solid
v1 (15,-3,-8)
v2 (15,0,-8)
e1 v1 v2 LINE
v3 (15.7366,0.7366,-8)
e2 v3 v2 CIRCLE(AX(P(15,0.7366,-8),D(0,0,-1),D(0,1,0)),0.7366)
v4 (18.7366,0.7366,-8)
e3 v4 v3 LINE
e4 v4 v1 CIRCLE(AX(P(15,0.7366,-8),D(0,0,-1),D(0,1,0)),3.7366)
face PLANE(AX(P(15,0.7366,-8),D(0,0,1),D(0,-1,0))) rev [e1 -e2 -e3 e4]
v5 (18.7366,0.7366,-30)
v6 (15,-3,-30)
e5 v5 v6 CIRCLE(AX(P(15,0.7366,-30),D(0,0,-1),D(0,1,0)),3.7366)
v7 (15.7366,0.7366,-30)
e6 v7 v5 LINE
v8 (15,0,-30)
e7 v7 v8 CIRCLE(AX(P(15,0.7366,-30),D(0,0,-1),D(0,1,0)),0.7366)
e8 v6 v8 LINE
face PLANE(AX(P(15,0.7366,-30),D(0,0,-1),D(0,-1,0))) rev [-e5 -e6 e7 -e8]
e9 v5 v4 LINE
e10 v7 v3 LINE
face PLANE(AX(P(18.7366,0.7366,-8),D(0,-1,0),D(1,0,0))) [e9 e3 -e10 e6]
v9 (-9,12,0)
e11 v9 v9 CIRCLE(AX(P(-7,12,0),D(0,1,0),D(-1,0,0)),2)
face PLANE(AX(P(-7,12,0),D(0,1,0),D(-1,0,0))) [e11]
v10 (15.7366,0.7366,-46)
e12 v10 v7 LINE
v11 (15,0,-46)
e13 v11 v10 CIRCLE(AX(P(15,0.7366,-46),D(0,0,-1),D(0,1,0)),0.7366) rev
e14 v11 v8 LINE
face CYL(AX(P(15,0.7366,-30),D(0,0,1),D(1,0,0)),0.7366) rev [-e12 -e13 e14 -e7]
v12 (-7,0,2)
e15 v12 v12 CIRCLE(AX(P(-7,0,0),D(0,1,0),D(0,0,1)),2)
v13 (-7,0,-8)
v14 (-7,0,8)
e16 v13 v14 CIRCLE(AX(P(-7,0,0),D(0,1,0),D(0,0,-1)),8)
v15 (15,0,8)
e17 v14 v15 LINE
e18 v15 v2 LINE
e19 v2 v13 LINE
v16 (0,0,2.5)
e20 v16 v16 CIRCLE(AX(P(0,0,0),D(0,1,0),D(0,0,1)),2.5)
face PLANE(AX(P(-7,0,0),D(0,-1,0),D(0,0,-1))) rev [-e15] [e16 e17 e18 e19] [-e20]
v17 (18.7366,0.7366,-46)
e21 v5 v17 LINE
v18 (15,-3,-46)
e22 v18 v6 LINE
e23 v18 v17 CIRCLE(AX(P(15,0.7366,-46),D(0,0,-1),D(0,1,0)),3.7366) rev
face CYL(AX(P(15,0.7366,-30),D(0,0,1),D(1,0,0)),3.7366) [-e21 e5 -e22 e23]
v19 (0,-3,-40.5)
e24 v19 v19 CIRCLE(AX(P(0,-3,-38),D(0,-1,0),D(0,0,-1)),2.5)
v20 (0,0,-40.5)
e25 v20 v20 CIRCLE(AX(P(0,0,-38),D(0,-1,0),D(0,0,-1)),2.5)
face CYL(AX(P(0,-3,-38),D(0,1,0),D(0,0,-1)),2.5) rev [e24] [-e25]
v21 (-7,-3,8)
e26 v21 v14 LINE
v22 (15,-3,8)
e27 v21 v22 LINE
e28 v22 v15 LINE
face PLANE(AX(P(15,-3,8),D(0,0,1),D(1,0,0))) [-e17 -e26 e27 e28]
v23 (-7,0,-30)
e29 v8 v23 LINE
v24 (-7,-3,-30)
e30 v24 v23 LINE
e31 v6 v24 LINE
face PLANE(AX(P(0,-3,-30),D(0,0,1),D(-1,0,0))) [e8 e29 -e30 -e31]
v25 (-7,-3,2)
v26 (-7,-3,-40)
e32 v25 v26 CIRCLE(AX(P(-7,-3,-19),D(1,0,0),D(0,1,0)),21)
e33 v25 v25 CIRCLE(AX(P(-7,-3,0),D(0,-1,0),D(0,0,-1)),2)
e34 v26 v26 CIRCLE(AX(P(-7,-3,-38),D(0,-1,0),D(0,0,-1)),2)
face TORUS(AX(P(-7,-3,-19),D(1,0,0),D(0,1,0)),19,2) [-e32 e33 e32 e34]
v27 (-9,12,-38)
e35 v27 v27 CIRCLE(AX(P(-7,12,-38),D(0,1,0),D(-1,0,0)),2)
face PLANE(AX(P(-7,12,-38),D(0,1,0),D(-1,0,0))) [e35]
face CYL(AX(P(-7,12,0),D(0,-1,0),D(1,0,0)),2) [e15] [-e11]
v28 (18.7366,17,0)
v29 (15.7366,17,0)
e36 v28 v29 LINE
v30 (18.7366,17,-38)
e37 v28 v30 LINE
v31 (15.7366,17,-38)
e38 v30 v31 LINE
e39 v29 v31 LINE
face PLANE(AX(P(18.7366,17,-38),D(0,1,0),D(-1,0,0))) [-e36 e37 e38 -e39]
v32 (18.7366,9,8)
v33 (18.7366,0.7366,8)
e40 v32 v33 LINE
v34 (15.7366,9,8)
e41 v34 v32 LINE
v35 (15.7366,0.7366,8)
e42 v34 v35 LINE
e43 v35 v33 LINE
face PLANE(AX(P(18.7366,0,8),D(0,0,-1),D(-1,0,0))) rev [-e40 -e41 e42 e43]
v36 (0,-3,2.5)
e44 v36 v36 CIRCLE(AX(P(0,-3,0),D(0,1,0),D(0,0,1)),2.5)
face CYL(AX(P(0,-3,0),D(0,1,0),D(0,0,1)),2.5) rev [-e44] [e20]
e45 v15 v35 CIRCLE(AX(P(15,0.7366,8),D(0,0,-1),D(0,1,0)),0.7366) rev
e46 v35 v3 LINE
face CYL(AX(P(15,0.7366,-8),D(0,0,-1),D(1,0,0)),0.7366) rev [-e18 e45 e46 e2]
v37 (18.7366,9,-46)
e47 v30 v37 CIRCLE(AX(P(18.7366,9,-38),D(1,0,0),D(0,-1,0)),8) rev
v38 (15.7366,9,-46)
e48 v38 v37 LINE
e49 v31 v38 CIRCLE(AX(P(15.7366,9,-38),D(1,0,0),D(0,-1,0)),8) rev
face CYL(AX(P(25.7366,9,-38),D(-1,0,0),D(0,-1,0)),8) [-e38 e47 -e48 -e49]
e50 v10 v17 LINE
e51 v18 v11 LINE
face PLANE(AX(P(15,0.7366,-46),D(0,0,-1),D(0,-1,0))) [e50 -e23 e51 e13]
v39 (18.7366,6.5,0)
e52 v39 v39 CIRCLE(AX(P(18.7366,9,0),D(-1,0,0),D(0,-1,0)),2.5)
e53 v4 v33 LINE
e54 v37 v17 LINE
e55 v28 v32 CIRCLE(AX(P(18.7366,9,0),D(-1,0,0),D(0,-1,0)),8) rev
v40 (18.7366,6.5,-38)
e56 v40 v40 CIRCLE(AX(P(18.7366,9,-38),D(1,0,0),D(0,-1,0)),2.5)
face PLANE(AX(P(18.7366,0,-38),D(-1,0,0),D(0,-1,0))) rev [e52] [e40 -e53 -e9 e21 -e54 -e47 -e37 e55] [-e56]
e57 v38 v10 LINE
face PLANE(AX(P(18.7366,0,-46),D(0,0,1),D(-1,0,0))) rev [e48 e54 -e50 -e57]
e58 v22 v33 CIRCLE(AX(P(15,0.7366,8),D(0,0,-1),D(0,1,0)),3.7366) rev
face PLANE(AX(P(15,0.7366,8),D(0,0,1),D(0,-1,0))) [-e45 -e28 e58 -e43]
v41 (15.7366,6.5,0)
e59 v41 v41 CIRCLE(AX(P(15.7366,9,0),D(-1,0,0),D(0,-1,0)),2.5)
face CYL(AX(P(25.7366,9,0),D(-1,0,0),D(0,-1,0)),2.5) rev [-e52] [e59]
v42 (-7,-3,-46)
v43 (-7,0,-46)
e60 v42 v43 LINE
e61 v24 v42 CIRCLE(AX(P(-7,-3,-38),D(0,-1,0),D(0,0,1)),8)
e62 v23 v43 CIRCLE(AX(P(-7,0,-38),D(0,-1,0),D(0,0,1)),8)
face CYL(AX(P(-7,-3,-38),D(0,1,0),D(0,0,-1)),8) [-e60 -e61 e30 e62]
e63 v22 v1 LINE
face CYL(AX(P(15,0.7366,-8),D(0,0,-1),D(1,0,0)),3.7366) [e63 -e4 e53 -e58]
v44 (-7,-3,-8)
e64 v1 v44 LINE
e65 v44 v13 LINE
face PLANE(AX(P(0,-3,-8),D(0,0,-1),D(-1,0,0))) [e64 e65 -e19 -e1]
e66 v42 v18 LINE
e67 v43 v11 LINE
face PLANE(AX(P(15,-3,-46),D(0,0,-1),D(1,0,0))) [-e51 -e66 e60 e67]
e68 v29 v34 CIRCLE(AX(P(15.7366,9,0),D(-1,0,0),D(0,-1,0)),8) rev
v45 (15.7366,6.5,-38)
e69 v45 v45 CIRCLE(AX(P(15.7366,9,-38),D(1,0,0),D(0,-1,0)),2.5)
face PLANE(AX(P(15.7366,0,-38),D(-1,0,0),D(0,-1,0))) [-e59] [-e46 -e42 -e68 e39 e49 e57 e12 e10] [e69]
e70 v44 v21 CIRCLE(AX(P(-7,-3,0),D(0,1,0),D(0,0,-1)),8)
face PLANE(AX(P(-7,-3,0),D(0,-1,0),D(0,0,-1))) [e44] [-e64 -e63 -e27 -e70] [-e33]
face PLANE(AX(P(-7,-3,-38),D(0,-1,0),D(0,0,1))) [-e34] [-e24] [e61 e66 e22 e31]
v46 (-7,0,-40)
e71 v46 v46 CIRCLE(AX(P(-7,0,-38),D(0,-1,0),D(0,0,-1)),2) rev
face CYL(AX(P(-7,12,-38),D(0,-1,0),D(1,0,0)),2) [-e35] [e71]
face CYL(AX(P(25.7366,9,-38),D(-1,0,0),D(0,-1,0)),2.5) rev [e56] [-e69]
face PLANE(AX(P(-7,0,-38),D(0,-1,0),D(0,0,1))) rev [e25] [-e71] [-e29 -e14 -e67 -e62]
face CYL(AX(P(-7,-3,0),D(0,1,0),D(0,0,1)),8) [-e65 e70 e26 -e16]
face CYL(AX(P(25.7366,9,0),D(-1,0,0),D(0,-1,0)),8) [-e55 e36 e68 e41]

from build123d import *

# Parameters (mm, degrees)
SKETCH1_R           = 2.5
SKETCH1_R_2         = 2
BASE_FLANGE1_DEPTH  = 3
EDGE_FLANGE1_DEPTH  = 16
SKETCH10_R          = 2.5
CUT_EXTRUDE1_DEPTH  = 10
TAB1_START          = -3
TAB1_DEPTH          = 3
SWEEP1_PROFILE_R    = 2
BOSS_EXTRUDE1_START = 15
SKETCH35_R          = 2
BOSS_EXTRUDE1_DEPTH = 15


# Read off the part's stored shape, not the designer's step: Tab1
# Sheet-metal steps are written as plain solids
with BuildPart() as part:
    # Sketch1 → Base-Flange1 (new body)
    with BuildSketch(Plane(origin=(0, 0, 0), x_dir=(1, 0, 0), z_dir=(0, 1, 0))):
        with BuildLine():
            Line((0, -8), (-7, -8))
            ThreePointArc((-7, -8), (-15, 0), (-7, 8))
            Line((-7, 8), (0, 8))
            Line((0, 8), (15, 8))
            Line((15, 8), (15, -8))
            Line((15, -8), (0, -8))
        make_face()
        with Locations(Location((0, 0, 0), (0, 0, 270))):
            Circle(SKETCH1_R, mode=Mode.SUBTRACT)
        with Locations(Location((-7, 0, 0), (0, 0, 270))):
            Circle(SKETCH1_R_2, mode=Mode.SUBTRACT)
    extrude(amount=-BASE_FLANGE1_DEPTH)

    # Edge-Flange1 section (across the edge) → Edge-Flange1 (add)
    with BuildSketch(Plane(origin=(15.7366, 0, 8), x_dir=(-1, 0, 0), z_dir=(0, 0, -1))):
        with BuildLine():
            Line((-3, 0.7366), (-3, 17))
            Line((-3, 17), (0, 17))
            Line((0, 17), (0, 0.7366))
            ThreePointArc((0, 0.7366), (0.215745145, 0.215745145), (0.7366, 0))
            Line((0.7366, 0), (0.7366, -3))
            ThreePointArc((0.7366, -3), (-1.905575199, -1.905575199), (-3, 0.7366))
        make_face()
    extrude(amount=EDGE_FLANGE1_DEPTH)

    # Sketch10 → Cut-Extrude1 (cut)
    with BuildSketch(Plane.ZY.offset(-15.7366)):
        with BuildLine():
            Line((-8, 17), (-8, 9))
            ThreePointArc((-8, 9), (-5.656854249, 14.656854249), (0, 17))
            Line((0, 17), (-8, 17))
        make_face()
        with BuildLine():
            Line((8, 17), (0, 17))
            ThreePointArc((0, 17), (5.656854249, 14.656854249), (8, 9))
            Line((8, 9), (8, 17))
        make_face()
        with Locations(Location((0, 9, 0), (0, 0, 270))):
            Circle(SKETCH10_R)
    extrude(amount=-CUT_EXTRUDE1_DEPTH, mode=Mode.SUBTRACT)


with BuildPart() as body_2:
    # Mirror1: mirrored copy
    add(part.part.mirror(Plane.XY.offset(-19)))


with BuildPart() as part_1:
    add(part.part)

    add(body_2.part)  # Tab1 merges body 2
    # Tab1 outline → Tab1 (add)
    with BuildSketch(Plane.ZY.offset(-15.7366).offset(TAB1_START)):
        with BuildLine():
            ThreePointArc((-8, 9), (-5.656854249, 14.656854249), (0, 17))
            Line((0, 17), (-38, 17))
            ThreePointArc((-38, 17), (-32.343145751, 14.656854249), (-30, 9))
            Line((-30, 9), (-30, 0.7366))
            Line((-30, 0.7366), (-8, 0.7366))
            Line((-8, 0.7366), (-8, 9))
        make_face()
    extrude(amount=TAB1_DEPTH)



with BuildPart() as body_2_2:
    # Sweep1: sweep along a path in Sketch15
    with BuildLine(Plane.ZY.offset(7)) as sweep1_path:
        ThreePointArc((0, -3), (-19, -22), (-38, -3))
    # Sweep1 profile (on start of the path) → Sweep1 (sweep)
    with BuildSketch(Plane(origin=(-7, -3, 0), x_dir=(-1, 0, 0), z_dir=(0, -1, 0))):
        Circle(SWEEP1_PROFILE_R)
    sweep(path=sweep1_path.line)


with BuildPart() as part_2:
    add(part_1.part)

    add(body_2_2.part)  # Boss-Extrude1 merges body 2 2
    # Sketch35 → Boss-Extrude1 (add)
    with BuildSketch(Plane(origin=(0, -3, 0), x_dir=(1, 0, 0), z_dir=(0, 1, 0)).offset(BOSS_EXTRUDE1_START)):
        with Locations(Location((-7, 38, 0), (0, 0, 90))):
            Circle(SKETCH35_R)
        with Locations(Location((-7, 0, 0), (0, 0, 270))):
            Circle(SKETCH35_R)
    extrude(amount=-BOSS_EXTRUDE1_DEPTH)


solid = part_2.part
